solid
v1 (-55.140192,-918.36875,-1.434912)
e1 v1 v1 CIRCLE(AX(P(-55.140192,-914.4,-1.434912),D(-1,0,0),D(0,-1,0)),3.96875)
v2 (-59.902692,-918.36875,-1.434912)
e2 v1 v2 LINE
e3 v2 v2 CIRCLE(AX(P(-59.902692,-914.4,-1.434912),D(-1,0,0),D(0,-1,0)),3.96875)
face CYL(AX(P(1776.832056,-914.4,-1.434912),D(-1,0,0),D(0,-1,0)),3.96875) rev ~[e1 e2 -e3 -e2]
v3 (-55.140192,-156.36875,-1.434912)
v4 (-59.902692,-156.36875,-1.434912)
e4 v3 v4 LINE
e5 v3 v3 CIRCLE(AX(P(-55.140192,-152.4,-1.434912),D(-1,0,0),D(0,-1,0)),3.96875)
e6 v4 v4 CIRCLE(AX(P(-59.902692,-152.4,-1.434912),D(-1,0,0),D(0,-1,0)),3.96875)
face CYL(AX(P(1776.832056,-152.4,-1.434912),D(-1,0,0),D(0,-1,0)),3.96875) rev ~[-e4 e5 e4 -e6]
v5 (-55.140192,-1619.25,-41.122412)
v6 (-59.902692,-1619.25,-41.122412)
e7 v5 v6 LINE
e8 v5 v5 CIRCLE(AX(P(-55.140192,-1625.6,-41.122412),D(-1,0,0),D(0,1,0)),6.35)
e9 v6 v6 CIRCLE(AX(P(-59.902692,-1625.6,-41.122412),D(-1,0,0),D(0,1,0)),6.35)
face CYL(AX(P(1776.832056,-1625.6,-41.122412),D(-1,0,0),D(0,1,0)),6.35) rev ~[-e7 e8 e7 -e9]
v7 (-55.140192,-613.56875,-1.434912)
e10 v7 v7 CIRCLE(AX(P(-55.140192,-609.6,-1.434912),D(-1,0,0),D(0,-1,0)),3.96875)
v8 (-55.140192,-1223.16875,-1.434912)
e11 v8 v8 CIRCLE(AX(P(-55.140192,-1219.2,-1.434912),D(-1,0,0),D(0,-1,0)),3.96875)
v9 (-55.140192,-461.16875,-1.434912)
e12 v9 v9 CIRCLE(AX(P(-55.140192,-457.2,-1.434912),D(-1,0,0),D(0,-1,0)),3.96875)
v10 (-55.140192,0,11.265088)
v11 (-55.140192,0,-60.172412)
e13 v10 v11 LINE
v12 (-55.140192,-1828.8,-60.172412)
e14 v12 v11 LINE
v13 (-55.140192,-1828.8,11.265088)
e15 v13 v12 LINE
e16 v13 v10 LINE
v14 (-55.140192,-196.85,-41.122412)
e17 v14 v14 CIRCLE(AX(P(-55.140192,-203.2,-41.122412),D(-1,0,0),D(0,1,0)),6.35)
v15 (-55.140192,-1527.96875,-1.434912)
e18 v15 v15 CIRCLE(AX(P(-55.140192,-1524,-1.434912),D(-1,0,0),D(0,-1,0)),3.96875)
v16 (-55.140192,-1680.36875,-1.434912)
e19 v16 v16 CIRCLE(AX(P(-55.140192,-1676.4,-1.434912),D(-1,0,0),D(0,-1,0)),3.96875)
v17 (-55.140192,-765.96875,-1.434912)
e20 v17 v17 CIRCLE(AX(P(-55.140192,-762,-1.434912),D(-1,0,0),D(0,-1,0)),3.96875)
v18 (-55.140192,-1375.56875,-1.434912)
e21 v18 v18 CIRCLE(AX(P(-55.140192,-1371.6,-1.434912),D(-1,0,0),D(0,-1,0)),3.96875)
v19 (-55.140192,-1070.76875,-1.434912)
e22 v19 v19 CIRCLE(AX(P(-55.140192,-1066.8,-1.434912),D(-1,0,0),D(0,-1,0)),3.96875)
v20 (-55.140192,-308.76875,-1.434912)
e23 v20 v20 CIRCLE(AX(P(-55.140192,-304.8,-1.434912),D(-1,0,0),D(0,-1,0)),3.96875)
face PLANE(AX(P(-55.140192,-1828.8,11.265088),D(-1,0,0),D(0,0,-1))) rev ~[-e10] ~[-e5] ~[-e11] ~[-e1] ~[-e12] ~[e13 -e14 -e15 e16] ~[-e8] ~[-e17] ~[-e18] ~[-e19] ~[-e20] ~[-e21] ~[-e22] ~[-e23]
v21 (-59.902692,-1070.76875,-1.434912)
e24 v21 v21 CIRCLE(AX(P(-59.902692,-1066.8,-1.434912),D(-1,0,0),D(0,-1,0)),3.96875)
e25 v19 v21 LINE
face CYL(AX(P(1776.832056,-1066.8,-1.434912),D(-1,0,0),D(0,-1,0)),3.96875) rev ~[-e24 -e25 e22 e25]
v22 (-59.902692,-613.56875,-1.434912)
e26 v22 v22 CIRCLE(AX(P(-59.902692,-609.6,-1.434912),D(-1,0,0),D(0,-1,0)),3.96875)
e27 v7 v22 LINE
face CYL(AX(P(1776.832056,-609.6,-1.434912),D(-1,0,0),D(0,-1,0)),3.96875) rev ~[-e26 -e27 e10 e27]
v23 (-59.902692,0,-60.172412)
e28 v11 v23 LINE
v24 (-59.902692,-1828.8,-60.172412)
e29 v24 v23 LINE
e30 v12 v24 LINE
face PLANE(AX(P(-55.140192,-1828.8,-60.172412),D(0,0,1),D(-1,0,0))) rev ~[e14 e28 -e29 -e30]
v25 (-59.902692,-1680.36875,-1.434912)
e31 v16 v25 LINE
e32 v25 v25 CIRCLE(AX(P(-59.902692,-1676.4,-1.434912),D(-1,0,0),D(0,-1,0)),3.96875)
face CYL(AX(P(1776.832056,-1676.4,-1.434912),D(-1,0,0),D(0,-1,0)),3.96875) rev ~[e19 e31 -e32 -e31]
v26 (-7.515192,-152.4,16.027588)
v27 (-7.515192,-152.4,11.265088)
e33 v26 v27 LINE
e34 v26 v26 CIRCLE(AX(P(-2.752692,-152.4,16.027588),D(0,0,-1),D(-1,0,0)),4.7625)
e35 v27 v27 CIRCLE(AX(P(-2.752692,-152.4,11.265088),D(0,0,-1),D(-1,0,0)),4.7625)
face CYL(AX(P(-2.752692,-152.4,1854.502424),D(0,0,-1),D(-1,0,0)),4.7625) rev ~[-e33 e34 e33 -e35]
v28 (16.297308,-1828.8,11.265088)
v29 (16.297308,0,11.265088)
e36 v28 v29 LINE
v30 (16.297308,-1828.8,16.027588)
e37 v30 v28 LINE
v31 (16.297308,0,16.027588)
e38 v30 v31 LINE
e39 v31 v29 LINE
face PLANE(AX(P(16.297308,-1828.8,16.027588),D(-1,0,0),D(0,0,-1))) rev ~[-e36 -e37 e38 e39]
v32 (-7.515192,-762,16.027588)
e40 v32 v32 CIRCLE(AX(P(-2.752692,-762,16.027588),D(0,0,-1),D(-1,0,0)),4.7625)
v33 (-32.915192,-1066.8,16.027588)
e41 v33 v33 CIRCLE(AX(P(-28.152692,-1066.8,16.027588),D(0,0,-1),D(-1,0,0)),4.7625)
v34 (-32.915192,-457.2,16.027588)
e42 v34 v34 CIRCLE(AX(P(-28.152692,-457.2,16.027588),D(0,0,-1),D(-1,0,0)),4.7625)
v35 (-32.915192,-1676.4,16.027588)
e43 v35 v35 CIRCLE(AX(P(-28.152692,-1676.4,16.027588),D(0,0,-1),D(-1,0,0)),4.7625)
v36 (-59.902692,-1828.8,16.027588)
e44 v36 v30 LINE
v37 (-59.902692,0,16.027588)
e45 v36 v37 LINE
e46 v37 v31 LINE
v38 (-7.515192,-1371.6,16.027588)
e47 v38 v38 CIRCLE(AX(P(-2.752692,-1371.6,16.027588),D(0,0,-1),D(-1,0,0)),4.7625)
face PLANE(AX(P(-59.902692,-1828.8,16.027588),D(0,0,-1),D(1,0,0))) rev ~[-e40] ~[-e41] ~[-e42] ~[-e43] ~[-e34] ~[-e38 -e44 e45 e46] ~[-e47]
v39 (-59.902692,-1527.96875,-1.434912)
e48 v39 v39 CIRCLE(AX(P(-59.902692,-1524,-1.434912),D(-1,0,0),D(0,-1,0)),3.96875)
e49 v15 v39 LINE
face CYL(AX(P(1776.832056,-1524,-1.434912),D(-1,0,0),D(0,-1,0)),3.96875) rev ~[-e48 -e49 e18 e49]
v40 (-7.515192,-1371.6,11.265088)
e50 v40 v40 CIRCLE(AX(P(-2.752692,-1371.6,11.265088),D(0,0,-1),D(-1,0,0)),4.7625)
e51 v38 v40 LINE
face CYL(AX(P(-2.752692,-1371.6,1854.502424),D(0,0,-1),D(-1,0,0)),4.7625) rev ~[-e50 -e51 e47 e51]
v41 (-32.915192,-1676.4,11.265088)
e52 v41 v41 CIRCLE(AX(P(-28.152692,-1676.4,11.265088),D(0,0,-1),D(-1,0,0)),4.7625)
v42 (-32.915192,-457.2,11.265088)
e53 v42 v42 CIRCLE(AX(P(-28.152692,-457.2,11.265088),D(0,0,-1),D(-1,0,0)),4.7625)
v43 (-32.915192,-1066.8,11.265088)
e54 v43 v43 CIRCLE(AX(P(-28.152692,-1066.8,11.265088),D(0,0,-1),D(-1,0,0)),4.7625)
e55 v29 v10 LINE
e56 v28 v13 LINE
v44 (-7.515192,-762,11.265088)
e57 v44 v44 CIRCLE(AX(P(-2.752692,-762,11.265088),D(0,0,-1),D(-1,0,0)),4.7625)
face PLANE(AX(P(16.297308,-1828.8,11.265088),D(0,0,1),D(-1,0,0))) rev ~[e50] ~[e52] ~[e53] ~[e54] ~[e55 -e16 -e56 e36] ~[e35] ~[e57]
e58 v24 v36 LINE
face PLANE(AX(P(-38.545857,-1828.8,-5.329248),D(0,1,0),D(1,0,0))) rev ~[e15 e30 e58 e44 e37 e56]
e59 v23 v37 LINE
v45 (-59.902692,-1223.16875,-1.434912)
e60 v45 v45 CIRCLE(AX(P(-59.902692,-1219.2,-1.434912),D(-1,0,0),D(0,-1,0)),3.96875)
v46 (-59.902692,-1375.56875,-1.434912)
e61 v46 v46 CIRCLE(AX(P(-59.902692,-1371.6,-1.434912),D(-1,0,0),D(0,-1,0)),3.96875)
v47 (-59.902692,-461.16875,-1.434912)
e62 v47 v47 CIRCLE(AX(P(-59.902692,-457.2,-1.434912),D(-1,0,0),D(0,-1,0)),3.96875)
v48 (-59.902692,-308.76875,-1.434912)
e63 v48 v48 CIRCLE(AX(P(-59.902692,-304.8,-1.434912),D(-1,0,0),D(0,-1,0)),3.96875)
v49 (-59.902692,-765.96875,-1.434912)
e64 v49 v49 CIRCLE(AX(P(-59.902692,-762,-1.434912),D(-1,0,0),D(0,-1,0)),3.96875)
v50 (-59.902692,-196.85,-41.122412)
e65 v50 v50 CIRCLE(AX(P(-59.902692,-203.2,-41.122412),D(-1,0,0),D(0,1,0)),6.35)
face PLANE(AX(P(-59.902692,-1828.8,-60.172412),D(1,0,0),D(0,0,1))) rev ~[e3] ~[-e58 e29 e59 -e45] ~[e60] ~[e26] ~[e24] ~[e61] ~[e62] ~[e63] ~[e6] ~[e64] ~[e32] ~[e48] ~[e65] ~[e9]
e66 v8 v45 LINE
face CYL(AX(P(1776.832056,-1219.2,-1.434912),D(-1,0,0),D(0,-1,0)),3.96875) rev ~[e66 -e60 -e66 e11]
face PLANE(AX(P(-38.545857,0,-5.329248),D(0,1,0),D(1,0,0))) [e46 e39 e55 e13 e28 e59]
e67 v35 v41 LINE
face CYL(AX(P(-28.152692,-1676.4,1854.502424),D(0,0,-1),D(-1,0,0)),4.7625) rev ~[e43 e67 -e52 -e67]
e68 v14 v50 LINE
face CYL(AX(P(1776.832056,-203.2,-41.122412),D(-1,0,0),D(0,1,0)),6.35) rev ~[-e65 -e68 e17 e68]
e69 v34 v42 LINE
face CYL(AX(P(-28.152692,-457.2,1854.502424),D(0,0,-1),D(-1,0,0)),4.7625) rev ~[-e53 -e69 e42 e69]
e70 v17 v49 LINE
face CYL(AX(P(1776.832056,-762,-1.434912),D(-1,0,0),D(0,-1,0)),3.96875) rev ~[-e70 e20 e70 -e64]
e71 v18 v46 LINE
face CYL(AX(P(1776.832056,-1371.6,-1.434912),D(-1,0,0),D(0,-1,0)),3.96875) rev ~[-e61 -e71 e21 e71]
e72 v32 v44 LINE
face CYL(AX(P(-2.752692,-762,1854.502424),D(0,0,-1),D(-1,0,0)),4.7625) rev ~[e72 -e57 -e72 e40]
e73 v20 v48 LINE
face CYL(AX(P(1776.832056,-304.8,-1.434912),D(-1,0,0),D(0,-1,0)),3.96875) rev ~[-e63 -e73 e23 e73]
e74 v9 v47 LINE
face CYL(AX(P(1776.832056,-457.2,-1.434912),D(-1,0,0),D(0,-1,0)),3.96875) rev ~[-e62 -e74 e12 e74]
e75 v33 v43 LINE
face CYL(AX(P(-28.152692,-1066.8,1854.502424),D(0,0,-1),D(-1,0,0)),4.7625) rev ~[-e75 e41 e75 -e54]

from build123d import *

# Parameters (mm, degrees)
F1_DEPTH = 1828.8
F3_D     = 12.7
F5_D     = 9.525
F6_ANGLE = 180
F9_D     = 7.9375


# Not quite as in the source:
# - a length typed as a fraction of an inch, garbled in the dataset ("3 / 203.2 mm" for 3/8 in), is restored
# - a feature names something its author has since deleted; it is built from what else it names


with BuildPart() as f1:
    # F0 (on Front) → F1 (new body)
    with BuildSketch(Plane.XZ):
        Polygon((-59.9026924796, 82.7025878191), (-59.9026924796, 6.5025878191), (16.2973075204, 6.5025878191), (16.2973075204, 11.2650878191), (-55.1401924796, 11.2650878191), (-55.1401924796, 82.7025878191), align=None)
    extrude(amount=F1_DEPTH)

    # F3 (through all)
    with Locations(Plane.YZ.offset(-55.1401924796)):
        with Locations((-203.2, 63.6525878191), (-1625.6, 63.6525878191)):
            Hole(F3_D / 2)

    # F5 (through all)
    with Locations(Plane(origin=(0, 0, 0), x_dir=(1, 0, 0), z_dir=(0, 0, -1))):
        with Locations((-28.1526924796, 1371.6), (-2.7526924796, 1676.4), (-2.7526924796, 1066.8), (-28.1526924796, 762), (-2.7526924796, 457.2), (-28.1526924796, 152.4)):
            Hole(F5_D / 2)


with BuildPart() as f1_1:
    # F6: moved
    add(f1.part.rotate(Axis((-19.4214424796, -1828.8, 11.2650878191), (-1, 0, 0)), F6_ANGLE))


with BuildPart() as f1_2:
    # F7: moved
    add(f1_1.part.moved(Location((0, 1828.8, 0))))

    # F9 (through all)
    with Locations(Plane.YZ.offset(-55.1401924796)):
        with Locations((-152.4, -1.4349121809), (-304.8, -1.4349121809), (-457.2, -1.4349121809), (-609.6, -1.4349121809), (-762, -1.4349121809), (-914.4, -1.4349121809), (-1066.8, -1.4349121809), (-1219.2, -1.4349121809), (-1371.6, -1.4349121809), (-1524, -1.4349121809), (-1676.4, -1.4349121809)):
            Hole(F9_D / 2)


solid = f1_2.part
